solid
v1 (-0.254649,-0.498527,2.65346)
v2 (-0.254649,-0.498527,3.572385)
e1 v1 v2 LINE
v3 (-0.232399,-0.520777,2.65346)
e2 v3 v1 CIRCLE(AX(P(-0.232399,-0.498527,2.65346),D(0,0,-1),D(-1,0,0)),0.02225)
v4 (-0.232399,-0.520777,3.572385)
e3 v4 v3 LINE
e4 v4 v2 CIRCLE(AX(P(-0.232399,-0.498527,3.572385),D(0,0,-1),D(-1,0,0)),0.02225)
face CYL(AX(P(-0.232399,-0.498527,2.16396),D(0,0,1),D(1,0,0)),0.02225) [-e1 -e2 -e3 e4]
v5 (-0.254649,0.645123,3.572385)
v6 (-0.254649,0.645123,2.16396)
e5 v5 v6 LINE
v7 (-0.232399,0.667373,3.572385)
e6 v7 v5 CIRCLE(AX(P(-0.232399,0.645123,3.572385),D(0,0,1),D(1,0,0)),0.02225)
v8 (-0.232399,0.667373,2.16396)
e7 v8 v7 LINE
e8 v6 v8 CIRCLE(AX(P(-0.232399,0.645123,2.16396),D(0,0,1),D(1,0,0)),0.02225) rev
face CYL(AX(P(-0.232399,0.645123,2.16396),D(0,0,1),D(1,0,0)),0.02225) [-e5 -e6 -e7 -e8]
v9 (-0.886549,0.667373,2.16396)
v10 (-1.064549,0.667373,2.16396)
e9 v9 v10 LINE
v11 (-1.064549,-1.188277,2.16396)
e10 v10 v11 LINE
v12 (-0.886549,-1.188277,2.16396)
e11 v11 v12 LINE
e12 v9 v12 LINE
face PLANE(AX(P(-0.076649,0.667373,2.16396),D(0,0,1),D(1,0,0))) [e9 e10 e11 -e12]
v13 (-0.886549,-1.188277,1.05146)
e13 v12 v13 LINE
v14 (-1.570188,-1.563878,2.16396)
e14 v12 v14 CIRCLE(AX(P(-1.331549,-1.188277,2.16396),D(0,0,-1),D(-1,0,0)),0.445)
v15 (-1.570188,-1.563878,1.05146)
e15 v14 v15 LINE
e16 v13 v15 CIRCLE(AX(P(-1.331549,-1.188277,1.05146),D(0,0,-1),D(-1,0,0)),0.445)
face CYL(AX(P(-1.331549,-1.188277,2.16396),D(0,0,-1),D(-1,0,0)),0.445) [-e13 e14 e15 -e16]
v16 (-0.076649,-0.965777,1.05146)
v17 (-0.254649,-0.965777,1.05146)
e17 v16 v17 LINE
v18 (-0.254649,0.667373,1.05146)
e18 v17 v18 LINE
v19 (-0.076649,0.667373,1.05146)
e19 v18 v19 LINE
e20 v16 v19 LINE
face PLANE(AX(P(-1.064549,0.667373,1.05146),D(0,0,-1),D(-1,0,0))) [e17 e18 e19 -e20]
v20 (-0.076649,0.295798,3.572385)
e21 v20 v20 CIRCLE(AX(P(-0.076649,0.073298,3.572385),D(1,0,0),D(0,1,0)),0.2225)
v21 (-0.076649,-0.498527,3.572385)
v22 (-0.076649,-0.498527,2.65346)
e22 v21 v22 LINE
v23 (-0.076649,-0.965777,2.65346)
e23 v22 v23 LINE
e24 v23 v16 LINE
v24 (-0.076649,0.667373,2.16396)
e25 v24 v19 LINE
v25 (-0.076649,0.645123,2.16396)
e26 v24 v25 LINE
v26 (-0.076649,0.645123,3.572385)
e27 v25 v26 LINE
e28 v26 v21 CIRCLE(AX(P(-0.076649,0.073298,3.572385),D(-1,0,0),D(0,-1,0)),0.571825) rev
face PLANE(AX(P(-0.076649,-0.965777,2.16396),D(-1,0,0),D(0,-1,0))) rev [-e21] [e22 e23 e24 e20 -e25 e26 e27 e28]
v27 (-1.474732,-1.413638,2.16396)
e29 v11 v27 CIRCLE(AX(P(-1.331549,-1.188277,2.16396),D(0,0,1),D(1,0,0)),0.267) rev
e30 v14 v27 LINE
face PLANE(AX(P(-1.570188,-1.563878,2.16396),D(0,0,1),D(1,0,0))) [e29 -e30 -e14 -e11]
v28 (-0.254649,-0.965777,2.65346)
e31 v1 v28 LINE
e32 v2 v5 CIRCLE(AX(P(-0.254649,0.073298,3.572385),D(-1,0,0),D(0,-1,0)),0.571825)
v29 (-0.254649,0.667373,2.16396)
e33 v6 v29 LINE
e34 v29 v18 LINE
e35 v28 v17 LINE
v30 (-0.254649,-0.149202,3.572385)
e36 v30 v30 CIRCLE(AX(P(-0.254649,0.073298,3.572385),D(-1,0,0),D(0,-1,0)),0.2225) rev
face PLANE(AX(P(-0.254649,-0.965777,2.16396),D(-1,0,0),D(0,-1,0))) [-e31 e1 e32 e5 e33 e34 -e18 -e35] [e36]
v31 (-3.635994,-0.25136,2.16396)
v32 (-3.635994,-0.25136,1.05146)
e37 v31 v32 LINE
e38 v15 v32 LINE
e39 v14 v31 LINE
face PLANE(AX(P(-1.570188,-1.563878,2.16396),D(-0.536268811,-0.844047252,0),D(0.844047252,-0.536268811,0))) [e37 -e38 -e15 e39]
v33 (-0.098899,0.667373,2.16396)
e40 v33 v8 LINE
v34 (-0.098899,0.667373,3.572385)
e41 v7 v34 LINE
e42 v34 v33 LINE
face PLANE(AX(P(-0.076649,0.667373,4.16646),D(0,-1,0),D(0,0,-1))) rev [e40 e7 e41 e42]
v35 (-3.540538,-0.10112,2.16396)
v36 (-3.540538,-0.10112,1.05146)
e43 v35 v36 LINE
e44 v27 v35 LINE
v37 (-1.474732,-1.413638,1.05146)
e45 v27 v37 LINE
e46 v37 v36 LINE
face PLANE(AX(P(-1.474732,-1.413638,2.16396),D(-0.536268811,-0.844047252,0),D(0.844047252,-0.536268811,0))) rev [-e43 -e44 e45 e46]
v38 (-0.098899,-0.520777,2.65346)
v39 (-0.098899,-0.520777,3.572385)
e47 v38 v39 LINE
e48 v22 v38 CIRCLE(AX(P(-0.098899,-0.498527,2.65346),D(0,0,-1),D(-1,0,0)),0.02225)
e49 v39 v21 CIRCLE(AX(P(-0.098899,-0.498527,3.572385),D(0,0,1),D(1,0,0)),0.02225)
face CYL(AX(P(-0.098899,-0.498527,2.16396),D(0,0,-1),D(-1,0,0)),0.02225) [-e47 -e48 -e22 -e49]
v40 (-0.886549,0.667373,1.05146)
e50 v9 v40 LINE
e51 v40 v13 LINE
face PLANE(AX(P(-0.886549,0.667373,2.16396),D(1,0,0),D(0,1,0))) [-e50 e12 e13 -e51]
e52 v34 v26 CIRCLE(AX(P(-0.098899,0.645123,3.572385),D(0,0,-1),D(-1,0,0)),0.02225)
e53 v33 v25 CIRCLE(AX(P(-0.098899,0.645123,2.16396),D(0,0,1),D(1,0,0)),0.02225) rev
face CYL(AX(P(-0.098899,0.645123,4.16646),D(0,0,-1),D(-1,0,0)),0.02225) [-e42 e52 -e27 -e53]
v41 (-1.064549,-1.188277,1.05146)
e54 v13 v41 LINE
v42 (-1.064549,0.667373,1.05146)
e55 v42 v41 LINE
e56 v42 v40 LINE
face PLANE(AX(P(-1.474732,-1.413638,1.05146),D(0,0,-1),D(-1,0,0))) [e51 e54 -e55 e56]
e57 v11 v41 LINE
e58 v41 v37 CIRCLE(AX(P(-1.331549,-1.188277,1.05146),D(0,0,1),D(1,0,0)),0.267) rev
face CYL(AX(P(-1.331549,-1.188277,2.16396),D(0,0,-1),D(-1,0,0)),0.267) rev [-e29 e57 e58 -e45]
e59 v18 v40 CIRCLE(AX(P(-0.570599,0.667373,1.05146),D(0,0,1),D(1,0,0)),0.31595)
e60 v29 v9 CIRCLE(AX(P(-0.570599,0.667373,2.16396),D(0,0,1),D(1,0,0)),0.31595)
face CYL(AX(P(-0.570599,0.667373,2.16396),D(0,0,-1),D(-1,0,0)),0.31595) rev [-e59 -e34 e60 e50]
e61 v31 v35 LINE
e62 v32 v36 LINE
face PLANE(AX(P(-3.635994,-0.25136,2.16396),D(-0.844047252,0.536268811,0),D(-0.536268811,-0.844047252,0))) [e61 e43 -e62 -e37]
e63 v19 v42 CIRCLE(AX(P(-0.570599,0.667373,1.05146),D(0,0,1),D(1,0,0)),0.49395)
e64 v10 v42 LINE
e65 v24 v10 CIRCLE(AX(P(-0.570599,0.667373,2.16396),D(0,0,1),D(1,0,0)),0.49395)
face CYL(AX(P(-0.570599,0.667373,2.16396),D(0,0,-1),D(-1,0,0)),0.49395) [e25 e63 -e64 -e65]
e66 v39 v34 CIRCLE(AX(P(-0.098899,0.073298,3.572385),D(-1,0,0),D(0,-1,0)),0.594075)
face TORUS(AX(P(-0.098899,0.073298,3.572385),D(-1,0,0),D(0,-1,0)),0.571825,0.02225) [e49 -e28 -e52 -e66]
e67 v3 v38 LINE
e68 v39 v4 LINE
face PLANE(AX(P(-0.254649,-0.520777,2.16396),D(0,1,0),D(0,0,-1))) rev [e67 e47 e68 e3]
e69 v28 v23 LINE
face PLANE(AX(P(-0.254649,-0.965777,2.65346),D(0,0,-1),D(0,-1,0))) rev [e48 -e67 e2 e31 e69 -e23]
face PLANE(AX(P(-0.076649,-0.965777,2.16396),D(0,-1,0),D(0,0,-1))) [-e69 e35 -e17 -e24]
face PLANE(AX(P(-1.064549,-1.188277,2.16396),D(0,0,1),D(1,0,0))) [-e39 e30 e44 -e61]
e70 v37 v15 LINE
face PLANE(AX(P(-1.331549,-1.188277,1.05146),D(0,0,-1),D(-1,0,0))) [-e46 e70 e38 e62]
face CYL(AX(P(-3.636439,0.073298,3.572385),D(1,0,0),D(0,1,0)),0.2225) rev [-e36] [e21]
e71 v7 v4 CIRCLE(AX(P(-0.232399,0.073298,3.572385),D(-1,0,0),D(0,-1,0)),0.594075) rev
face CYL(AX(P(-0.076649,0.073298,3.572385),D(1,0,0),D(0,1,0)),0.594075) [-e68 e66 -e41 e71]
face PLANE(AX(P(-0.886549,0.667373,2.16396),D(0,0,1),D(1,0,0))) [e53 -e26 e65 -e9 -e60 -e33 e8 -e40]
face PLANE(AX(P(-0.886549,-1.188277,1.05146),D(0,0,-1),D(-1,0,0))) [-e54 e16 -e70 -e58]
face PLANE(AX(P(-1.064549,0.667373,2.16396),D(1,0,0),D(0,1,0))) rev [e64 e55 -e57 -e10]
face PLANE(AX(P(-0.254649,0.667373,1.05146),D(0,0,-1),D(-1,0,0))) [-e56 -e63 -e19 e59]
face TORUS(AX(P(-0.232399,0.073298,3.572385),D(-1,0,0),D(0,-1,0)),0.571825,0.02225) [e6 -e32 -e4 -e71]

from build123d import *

# Parameters (mm, degrees)
BASE_FLANGE1_DEPTH  = 2.5
SKETCH6_W           = 0.4
SKETCH6_H           = 3.67
BOSS_EXTRUDE1_DEPTH = 4.5
SKETCH7_W           = 3.4
SKETCH7_H           = 1
CUT_EXTRUDE1_DEPTH  = 4.5
FILLET1_RADIUS      = 1.335
FILLET1_LENGTH      = 0.4
FILLET2_R           = 0.05
CUT_EXTRUDE2_REACH  = 13.14
SKETCH8_R           = 0.5
SCALE1_SCALE        = 0.445


# Sheet-metal steps are written as plain solids
with BuildPart() as part:
    # Sketch1 → Base-Flange1 (new body)
    with BuildSketch(Plane.XY):
        with BuildLine():
            Line((0.71, -1.835), (0.71, 1.835))
            ThreePointArc((0.71, 1.835), (0, 2.545), (-0.71, 1.835))
            Line((-0.71, 1.835), (-0.71, -2.335))
            ThreePointArc((-0.71, -2.335), (-1.228475759, -3.211432773), (-2.246268811, -3.179047252))
            Line((-2.246268811, -3.179047252), (-6.888528694, -0.229568793))
            Line((-6.888528694, -0.229568793), (-6.67402117, 0.108050107))
            Line((-6.67402117, 0.108050107), (-2.031761286, -2.841428351))
            ThreePointArc((-2.031761286, -2.841428351), (-1.421085455, -2.860859664), (-1.11, -2.335))
            Line((-1.11, -2.335), (-1.11, 1.835))
            ThreePointArc((-1.11, 1.835), (0, 2.945), (1.11, 1.835))
            Line((1.11, 1.835), (1.11, -1.835))
            Line((1.11, -1.835), (0.71, -1.835))
        make_face()
    extrude(amount=BASE_FLANGE1_DEPTH)

    # Sketch6 → Boss-Extrude1 (add)
    with BuildSketch(Plane.XY.offset(2.5)):
        with Locations((0.91, 0)):
            Rectangle(SKETCH6_W, SKETCH6_H)
    extrude(amount=BOSS_EXTRUDE1_DEPTH)

    # Sketch7 → Cut-Extrude1 (cut)
    with BuildSketch(Plane(origin=(1.11, 0, 0), x_dir=(0, 0, -1), z_dir=(1, 0, 0))):
        with Locations((-5.3, -1.335)):
            Rectangle(SKETCH7_W, SKETCH7_H)
    extrude(amount=-CUT_EXTRUDE1_DEPTH, mode=Mode.SUBTRACT)

    # Fillet1: full round fillet: the end face becomes a half cylinder, R = half its width
    fillet1_face = Plane((0.91, 0.5, 7), x_dir=(-1, 0, 0), z_dir=(0, 0, 1))  # on the end face: x along it, z out of the body
    fillet1_slab = fillet1_face.offset(-FILLET1_RADIUS / 2) * Box(FILLET1_LENGTH, 2 * FILLET1_RADIUS, FILLET1_RADIUS, mode=Mode.PRIVATE)  # the body's end, R deep
    fillet1_round = Plane((0.91, 0.5, 5.665), x_dir=(0, 0, 1), z_dir=(-1, 0, 0)) * Cylinder(FILLET1_RADIUS, FILLET1_LENGTH, mode=Mode.PRIVATE)  # its axis R under the face
    add(fillet1_slab - fillet1_round, mode=Mode.SUBTRACT)

    # Fillet2
    fillet2_edges = [part.edges().sort_by_distance(p)[0] for p in [
        (0.71, -0.835, 4.6325),
        (1.11, -0.835, 4.6325),
        (0.71, 1.835, 4.0825),
        (1.11, 1.835, 4.0825),
        (1.11, 0.5, 7),
        (0.71, 0.5, 7),
    ]]
    fillet(fillet2_edges, radius=FILLET2_R)

    # Sketch8 → Cut-Extrude2 (cut, up to next)
    with BuildSketch(Plane(origin=(1.11, 0, 0), x_dir=(0, 0, -1), z_dir=(1, 0, 0)), mode=Mode.PRIVATE) as cut_extrude2_sk1:
        with Locations(Location((-5.665, 0.5, 0), (0, 0, 90))):
            Circle(SKETCH8_R)
    cut_extrude2_tool1 = extrude(cut_extrude2_sk1.sketch, amount=-CUT_EXTRUDE2_REACH, mode=Mode.PRIVATE) & part.part
    add(cut_extrude2_tool1.solids().sort_by_distance((1.11, 0.5, 5.665))[0], mode=Mode.SUBTRACT)


with BuildPart() as part_1:
    # Scale1: scaled about (-1.02810541, -0.268832407, 1.894523092)
    add(part.part.scale(SCALE1_SCALE).moved(Location((-0.570598503, -0.149201986, 1.051460316))))


solid = part_1.part
